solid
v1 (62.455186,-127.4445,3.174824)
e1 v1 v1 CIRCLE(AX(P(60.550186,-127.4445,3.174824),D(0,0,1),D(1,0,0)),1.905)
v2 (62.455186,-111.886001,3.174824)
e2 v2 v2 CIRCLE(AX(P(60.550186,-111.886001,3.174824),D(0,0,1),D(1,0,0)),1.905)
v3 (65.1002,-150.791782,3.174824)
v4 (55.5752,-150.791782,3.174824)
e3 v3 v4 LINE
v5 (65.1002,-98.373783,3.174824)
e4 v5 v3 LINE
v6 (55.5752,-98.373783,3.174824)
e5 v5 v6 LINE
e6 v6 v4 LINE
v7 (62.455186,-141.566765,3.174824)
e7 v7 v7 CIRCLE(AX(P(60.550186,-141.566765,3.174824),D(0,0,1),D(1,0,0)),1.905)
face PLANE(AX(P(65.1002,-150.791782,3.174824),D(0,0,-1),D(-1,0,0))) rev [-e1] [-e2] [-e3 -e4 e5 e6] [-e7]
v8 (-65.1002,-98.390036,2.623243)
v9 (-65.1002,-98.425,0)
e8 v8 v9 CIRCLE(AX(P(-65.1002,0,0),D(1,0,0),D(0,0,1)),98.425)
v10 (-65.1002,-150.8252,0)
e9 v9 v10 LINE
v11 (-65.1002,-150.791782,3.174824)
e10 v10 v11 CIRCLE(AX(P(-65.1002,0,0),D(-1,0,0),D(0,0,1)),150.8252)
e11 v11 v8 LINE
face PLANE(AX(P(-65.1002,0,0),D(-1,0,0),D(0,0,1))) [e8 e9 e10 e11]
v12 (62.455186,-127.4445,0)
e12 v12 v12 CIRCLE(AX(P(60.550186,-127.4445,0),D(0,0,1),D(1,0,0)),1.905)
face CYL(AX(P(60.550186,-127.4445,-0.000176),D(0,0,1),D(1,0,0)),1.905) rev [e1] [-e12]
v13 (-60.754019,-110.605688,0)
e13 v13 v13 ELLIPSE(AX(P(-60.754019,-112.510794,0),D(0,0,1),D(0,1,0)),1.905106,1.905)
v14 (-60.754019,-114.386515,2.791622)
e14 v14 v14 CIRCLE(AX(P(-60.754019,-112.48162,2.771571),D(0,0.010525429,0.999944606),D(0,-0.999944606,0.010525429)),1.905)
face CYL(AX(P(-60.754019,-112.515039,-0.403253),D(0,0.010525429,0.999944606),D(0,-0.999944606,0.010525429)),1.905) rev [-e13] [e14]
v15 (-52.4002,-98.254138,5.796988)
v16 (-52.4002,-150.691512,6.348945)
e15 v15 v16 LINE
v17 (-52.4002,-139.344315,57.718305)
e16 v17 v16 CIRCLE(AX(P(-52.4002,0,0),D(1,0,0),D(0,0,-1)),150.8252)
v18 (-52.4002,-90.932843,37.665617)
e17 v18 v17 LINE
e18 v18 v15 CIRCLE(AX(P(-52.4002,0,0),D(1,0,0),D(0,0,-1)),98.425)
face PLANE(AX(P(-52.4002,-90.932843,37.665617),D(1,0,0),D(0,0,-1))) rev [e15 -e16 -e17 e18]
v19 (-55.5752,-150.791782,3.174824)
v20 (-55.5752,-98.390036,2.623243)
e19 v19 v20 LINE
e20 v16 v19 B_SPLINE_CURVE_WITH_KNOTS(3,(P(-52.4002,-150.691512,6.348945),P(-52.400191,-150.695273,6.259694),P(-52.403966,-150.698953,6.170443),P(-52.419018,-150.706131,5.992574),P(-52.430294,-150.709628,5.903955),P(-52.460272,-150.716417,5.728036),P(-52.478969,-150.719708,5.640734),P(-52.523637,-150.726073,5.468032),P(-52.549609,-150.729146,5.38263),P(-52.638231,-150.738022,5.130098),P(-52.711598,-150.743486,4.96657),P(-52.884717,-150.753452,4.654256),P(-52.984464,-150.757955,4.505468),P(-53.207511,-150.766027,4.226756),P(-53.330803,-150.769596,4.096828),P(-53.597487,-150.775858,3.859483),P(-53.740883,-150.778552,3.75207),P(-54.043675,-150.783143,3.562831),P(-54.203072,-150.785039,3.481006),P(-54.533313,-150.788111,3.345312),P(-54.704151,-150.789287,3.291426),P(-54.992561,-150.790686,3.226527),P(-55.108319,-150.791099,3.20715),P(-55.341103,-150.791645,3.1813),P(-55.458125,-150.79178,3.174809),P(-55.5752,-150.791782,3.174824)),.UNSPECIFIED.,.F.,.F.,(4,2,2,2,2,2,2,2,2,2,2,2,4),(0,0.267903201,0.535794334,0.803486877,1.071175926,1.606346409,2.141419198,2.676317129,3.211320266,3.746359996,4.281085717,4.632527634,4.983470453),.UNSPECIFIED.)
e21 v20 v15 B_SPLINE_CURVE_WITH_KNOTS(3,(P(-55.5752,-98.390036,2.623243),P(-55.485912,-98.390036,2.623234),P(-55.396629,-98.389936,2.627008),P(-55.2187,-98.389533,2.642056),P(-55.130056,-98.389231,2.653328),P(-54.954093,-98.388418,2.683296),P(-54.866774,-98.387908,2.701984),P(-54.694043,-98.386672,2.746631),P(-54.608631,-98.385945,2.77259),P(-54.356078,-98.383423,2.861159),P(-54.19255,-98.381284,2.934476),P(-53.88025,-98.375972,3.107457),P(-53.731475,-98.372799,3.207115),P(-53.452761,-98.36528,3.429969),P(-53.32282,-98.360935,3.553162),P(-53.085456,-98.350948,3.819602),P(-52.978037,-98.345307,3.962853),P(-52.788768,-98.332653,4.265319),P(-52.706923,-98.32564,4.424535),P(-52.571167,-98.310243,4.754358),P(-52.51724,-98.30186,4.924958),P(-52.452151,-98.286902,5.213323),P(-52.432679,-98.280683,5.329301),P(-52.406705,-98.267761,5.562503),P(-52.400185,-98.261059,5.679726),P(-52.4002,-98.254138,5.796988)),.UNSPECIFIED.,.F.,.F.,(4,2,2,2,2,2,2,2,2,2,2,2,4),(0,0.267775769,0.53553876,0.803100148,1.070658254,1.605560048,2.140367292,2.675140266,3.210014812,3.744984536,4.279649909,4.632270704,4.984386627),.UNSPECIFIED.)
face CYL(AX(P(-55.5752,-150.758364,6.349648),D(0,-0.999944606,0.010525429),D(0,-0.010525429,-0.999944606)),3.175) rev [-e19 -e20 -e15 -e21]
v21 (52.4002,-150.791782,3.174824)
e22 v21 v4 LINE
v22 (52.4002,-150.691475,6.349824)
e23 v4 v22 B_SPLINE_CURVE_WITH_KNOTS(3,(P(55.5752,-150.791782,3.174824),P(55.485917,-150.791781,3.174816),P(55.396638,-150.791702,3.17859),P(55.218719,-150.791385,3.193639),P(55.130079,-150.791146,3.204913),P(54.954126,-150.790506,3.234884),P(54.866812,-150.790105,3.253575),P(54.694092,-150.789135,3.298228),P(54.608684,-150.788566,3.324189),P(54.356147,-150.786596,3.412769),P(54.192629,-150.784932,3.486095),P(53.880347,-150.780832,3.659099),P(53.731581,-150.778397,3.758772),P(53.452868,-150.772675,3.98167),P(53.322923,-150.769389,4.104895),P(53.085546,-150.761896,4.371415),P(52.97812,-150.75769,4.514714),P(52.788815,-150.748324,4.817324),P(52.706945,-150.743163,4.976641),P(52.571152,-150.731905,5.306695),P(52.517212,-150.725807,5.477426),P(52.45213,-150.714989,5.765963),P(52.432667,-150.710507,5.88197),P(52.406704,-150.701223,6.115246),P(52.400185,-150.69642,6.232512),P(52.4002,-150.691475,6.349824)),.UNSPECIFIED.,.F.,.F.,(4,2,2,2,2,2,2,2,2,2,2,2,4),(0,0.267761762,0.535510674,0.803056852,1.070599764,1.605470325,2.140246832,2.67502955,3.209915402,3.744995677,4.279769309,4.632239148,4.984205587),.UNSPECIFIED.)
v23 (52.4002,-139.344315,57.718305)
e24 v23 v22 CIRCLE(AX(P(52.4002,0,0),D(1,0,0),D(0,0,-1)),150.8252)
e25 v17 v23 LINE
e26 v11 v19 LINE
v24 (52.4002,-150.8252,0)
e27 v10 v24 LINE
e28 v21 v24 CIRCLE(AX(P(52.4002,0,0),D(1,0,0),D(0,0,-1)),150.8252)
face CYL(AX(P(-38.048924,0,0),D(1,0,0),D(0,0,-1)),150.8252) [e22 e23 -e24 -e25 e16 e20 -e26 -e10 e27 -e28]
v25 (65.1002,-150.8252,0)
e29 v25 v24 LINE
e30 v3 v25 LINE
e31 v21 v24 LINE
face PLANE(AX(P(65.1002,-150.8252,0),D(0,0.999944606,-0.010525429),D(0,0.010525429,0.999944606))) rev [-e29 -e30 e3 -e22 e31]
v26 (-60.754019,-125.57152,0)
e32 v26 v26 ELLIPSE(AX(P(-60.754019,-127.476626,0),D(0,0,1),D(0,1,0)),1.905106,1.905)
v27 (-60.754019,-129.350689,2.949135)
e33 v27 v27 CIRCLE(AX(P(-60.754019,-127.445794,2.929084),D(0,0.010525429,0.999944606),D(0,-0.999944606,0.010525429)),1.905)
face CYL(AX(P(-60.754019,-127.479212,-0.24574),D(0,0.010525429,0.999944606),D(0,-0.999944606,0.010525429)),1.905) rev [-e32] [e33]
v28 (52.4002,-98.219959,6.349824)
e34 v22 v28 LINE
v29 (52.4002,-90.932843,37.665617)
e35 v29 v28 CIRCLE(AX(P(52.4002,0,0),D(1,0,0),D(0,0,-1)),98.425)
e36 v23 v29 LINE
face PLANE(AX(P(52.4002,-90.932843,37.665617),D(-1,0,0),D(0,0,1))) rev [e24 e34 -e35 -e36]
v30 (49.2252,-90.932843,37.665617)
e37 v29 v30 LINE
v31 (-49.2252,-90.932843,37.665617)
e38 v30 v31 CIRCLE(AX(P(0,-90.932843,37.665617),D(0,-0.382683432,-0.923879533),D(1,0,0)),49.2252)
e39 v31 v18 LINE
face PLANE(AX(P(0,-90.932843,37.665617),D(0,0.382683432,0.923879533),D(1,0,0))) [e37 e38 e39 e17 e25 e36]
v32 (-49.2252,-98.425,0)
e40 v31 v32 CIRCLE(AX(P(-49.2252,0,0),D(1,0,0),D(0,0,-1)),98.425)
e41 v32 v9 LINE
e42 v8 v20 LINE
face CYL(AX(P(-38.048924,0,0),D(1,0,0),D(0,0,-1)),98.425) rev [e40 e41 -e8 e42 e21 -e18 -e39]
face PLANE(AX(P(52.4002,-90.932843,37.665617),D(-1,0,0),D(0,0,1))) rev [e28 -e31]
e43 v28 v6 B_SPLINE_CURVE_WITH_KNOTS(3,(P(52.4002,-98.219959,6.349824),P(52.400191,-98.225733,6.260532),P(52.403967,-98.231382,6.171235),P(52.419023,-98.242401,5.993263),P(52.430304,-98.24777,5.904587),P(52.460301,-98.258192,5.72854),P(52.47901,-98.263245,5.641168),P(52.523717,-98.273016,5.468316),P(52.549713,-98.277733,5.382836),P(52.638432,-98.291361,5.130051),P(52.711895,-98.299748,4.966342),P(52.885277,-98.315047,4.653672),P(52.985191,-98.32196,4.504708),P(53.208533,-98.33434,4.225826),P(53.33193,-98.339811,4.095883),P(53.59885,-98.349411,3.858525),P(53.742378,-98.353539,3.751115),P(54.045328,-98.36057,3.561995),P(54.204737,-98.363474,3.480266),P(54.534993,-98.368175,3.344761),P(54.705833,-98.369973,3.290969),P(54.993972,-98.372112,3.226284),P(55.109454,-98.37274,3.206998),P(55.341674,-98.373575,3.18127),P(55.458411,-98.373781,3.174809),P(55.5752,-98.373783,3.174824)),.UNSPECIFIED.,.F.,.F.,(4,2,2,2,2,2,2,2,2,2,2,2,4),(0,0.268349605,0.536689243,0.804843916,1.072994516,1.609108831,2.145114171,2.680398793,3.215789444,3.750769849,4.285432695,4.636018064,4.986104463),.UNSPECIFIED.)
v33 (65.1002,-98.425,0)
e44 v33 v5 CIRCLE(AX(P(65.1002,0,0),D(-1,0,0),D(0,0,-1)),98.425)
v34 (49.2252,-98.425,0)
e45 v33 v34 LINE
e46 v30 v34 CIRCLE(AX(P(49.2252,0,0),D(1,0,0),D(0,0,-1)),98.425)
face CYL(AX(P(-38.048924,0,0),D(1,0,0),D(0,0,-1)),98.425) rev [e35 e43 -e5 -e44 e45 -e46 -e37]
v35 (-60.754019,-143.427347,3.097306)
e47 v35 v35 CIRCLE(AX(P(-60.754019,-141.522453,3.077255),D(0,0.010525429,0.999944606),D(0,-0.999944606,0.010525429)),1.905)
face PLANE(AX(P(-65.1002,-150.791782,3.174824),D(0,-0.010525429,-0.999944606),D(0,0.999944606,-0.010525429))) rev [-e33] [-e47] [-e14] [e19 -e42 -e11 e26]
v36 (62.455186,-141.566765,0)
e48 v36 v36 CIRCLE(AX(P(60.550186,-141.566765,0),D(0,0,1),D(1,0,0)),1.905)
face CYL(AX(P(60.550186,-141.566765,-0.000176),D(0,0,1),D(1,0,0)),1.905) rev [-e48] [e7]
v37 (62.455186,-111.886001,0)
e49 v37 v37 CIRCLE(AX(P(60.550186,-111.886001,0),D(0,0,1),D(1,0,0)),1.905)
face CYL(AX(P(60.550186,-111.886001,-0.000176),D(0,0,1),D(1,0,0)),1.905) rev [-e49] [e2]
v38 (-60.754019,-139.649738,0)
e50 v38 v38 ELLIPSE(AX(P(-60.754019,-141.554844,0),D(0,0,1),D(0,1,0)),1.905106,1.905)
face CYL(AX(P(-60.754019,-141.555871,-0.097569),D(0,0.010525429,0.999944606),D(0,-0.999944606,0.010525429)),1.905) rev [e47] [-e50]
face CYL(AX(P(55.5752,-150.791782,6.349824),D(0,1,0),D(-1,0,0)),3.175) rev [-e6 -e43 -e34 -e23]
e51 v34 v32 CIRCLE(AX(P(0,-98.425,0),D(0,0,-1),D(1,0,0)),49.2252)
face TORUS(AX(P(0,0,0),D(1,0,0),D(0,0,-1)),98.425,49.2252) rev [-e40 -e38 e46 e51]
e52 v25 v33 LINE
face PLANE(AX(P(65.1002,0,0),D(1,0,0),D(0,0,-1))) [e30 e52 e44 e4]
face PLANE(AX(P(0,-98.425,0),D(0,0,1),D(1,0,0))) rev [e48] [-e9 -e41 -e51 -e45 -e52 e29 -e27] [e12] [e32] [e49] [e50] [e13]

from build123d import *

# Parameters (mm, degrees)
REVOLVE8_ANGLE         = 22.5
BOSS_EXTRUDE3_START    = 12.7
BOSS_EXTRUDE3_DEPTH    = 12.7
BOSS_EXTRUDE4_DEPTH    = 12.7
SKETCH12_R             = 1.905
CUT_EXTRUDE4_DEPTH     = 3.175
SKETCH13_R             = 1.905
CUT_EXTRUDE5_DEPTH     = 3.175
FLANGE_REINFORCEMENT_R = 3.175


with BuildPart() as part:
    # Sketch9 → Revolve8 (revolve)
    with BuildSketch(Plane.XY):
        with BuildLine():
            Line((-49.2252, -98.425), (-52.4002, -98.425))
            Line((-52.4002, -98.425), (-52.4002, -150.8252))
            Line((-52.4002, -150.8252), (52.4002, -150.8252))
            Line((52.4002, -150.8252), (52.4002, -98.425))
            Line((52.4002, -98.425), (49.2252, -98.425))
            ThreePointArc((49.2252, -98.425), (0, -147.6502), (-49.2252, -98.425))
        make_face()
    revolve(axis=Axis((-38.048924234, 0, 0), (-1, 0, 0)), revolution_arc=REVOLVE8_ANGLE)

    # Sketch11 → Boss-Extrude3 (add)
    with BuildSketch(Plane.ZY.offset(52.4002).offset(BOSS_EXTRUDE3_START)):
        with BuildLine():
            Line((0, -98.425), (0, -150.8252))
            ThreePointArc((0, -150.8252), (1.5875, -150.816845209), (3.174824124, -150.791781762))
            Line((3.174824124, -150.791781762), (2.623242695, -98.390036197))
            ThreePointArc((2.623242695, -98.390036197), (1.311737846, -98.416258661), (0, -98.425))
        make_face()
    extrude(amount=-BOSS_EXTRUDE3_DEPTH)

    # Sketch10 → Boss-Extrude4 (add)
    with BuildSketch(Plane(origin=(52.4002, 0, 0), x_dir=(0, 0, -1), z_dir=(1, 0, 0))):
        with BuildLine():
            Line((0, -98.425), (0, -150.8252))
            Line((0, -150.8252), (-3.174824124, -150.791781762))
            Line((-3.174824124, -150.791781762), (-3.174824124, -98.37378267))
            ThreePointArc((-3.174824124, -98.37378267), (-1.587618613, -98.412194834), (0, -98.425))
        make_face()
    extrude(amount=BOSS_EXTRUDE4_DEPTH)

    # Sketch12 → Cut-Extrude4 (cut)
    with BuildSketch(Plane.XY.offset(3.174824124)):
        with Locations((60.550186424, -111.886000657)):
            Circle(SKETCH12_R)
        with Locations((60.550186424, -141.566764633)):
            Circle(SKETCH12_R)
        with Locations((60.550186424, -127.4445)):
            Circle(SKETCH12_R)
    extrude(amount=-CUT_EXTRUDE4_DEPTH, mode=Mode.SUBTRACT)

    # Sketch13 → Cut-Extrude5 (cut)
    with BuildSketch(Plane(origin=(0, -0.008353865, 1.587675876), x_dir=(1, 0, 0), z_dir=(-8.55203915581382e-15, 0.010525429437517081, 0.9999446061333377))):
        with Locations(Location((-60.754019077, -141.521938379, 0), (0, 0, 270))):
            Circle(SKETCH13_R)
        with Locations(Location((-60.754019077, -112.479497113, 0), (0, 0, 270))):
            Circle(SKETCH13_R)
        with Locations(Location((-60.754019077, -127.4445, 0), (0, 0, 270))):
            Circle(SKETCH13_R)
    extrude(amount=-CUT_EXTRUDE5_DEPTH, mode=Mode.SUBTRACT)

    # Flange Reinforcement
    # the kernel refuses this fillet: 3.175 mm, written as the material it adds along each edge
    with BuildSketch(Plane(origin=(-52.4002, -158.728842073, 3.258369721), x_dir=(-8.951719505639043e-15, 0.010525429437517086, 0.9999446061333377), z_dir=(-8.181600859283099e-15, 0.9999446061333378, -0.01052542943751709))) as flange_reinforcement_piece_1_section:
        with BuildLine():
            CenterArc((FLANGE_REINFORCEMENT_R, -FLANGE_REINFORCEMENT_R), FLANGE_REINFORCEMENT_R, 90, 90)
            Line((0, -FLANGE_REINFORCEMENT_R), (0, 0))
            Line((0, 0), (FLANGE_REINFORCEMENT_R, 0))
        make_face()
    flange_reinforcement_piece_1 = extrude(amount=68.279648461, mode=Mode.PRIVATE)
    flange_reinforcement_piece_1 = flange_reinforcement_piece_1 - Plane(origin=(-53.118961538, 0, 0), x_dir=(0, -1, 0), z_dir=(-1, 0, 0)) * Cylinder(98.425, 150, mode=Mode.PRIVATE)
    flange_reinforcement_piece_1 = flange_reinforcement_piece_1 & Plane(origin=(-53.118961538, 0, 0), x_dir=(0, -1, 0), z_dir=(1, 0, 0)) * Cylinder(150.8252, 150, mode=Mode.PRIVATE)
    add(flange_reinforcement_piece_1)
    with BuildSketch(Plane(origin=(52.4002, -158.729281762, 3.174824124), x_dir=(0, 0, 1), z_dir=(0, 1, 0))) as flange_reinforcement_piece_2_section:
        with BuildLine():
            CenterArc((FLANGE_REINFORCEMENT_R, FLANGE_REINFORCEMENT_R), FLANGE_REINFORCEMENT_R, 180, 90)
            Line((0, FLANGE_REINFORCEMENT_R), (0, 0))
            Line((0, 0), (FLANGE_REINFORCEMENT_R, 0))
        make_face()
    flange_reinforcement_piece_2 = extrude(amount=68.292999092, mode=Mode.PRIVATE)
    flange_reinforcement_piece_2 = flange_reinforcement_piece_2 - Plane(origin=(53.118931151, 0, 0), x_dir=(0, -1, 0), z_dir=(-1, 0, 0)) * Cylinder(98.425, 150, mode=Mode.PRIVATE)
    flange_reinforcement_piece_2 = flange_reinforcement_piece_2 & Plane(origin=(53.118931151, 0, 0), x_dir=(0, -1, 0), z_dir=(1, 0, 0)) * Cylinder(150.8252, 150, mode=Mode.PRIVATE)
    add(flange_reinforcement_piece_2)


solid = part.part
